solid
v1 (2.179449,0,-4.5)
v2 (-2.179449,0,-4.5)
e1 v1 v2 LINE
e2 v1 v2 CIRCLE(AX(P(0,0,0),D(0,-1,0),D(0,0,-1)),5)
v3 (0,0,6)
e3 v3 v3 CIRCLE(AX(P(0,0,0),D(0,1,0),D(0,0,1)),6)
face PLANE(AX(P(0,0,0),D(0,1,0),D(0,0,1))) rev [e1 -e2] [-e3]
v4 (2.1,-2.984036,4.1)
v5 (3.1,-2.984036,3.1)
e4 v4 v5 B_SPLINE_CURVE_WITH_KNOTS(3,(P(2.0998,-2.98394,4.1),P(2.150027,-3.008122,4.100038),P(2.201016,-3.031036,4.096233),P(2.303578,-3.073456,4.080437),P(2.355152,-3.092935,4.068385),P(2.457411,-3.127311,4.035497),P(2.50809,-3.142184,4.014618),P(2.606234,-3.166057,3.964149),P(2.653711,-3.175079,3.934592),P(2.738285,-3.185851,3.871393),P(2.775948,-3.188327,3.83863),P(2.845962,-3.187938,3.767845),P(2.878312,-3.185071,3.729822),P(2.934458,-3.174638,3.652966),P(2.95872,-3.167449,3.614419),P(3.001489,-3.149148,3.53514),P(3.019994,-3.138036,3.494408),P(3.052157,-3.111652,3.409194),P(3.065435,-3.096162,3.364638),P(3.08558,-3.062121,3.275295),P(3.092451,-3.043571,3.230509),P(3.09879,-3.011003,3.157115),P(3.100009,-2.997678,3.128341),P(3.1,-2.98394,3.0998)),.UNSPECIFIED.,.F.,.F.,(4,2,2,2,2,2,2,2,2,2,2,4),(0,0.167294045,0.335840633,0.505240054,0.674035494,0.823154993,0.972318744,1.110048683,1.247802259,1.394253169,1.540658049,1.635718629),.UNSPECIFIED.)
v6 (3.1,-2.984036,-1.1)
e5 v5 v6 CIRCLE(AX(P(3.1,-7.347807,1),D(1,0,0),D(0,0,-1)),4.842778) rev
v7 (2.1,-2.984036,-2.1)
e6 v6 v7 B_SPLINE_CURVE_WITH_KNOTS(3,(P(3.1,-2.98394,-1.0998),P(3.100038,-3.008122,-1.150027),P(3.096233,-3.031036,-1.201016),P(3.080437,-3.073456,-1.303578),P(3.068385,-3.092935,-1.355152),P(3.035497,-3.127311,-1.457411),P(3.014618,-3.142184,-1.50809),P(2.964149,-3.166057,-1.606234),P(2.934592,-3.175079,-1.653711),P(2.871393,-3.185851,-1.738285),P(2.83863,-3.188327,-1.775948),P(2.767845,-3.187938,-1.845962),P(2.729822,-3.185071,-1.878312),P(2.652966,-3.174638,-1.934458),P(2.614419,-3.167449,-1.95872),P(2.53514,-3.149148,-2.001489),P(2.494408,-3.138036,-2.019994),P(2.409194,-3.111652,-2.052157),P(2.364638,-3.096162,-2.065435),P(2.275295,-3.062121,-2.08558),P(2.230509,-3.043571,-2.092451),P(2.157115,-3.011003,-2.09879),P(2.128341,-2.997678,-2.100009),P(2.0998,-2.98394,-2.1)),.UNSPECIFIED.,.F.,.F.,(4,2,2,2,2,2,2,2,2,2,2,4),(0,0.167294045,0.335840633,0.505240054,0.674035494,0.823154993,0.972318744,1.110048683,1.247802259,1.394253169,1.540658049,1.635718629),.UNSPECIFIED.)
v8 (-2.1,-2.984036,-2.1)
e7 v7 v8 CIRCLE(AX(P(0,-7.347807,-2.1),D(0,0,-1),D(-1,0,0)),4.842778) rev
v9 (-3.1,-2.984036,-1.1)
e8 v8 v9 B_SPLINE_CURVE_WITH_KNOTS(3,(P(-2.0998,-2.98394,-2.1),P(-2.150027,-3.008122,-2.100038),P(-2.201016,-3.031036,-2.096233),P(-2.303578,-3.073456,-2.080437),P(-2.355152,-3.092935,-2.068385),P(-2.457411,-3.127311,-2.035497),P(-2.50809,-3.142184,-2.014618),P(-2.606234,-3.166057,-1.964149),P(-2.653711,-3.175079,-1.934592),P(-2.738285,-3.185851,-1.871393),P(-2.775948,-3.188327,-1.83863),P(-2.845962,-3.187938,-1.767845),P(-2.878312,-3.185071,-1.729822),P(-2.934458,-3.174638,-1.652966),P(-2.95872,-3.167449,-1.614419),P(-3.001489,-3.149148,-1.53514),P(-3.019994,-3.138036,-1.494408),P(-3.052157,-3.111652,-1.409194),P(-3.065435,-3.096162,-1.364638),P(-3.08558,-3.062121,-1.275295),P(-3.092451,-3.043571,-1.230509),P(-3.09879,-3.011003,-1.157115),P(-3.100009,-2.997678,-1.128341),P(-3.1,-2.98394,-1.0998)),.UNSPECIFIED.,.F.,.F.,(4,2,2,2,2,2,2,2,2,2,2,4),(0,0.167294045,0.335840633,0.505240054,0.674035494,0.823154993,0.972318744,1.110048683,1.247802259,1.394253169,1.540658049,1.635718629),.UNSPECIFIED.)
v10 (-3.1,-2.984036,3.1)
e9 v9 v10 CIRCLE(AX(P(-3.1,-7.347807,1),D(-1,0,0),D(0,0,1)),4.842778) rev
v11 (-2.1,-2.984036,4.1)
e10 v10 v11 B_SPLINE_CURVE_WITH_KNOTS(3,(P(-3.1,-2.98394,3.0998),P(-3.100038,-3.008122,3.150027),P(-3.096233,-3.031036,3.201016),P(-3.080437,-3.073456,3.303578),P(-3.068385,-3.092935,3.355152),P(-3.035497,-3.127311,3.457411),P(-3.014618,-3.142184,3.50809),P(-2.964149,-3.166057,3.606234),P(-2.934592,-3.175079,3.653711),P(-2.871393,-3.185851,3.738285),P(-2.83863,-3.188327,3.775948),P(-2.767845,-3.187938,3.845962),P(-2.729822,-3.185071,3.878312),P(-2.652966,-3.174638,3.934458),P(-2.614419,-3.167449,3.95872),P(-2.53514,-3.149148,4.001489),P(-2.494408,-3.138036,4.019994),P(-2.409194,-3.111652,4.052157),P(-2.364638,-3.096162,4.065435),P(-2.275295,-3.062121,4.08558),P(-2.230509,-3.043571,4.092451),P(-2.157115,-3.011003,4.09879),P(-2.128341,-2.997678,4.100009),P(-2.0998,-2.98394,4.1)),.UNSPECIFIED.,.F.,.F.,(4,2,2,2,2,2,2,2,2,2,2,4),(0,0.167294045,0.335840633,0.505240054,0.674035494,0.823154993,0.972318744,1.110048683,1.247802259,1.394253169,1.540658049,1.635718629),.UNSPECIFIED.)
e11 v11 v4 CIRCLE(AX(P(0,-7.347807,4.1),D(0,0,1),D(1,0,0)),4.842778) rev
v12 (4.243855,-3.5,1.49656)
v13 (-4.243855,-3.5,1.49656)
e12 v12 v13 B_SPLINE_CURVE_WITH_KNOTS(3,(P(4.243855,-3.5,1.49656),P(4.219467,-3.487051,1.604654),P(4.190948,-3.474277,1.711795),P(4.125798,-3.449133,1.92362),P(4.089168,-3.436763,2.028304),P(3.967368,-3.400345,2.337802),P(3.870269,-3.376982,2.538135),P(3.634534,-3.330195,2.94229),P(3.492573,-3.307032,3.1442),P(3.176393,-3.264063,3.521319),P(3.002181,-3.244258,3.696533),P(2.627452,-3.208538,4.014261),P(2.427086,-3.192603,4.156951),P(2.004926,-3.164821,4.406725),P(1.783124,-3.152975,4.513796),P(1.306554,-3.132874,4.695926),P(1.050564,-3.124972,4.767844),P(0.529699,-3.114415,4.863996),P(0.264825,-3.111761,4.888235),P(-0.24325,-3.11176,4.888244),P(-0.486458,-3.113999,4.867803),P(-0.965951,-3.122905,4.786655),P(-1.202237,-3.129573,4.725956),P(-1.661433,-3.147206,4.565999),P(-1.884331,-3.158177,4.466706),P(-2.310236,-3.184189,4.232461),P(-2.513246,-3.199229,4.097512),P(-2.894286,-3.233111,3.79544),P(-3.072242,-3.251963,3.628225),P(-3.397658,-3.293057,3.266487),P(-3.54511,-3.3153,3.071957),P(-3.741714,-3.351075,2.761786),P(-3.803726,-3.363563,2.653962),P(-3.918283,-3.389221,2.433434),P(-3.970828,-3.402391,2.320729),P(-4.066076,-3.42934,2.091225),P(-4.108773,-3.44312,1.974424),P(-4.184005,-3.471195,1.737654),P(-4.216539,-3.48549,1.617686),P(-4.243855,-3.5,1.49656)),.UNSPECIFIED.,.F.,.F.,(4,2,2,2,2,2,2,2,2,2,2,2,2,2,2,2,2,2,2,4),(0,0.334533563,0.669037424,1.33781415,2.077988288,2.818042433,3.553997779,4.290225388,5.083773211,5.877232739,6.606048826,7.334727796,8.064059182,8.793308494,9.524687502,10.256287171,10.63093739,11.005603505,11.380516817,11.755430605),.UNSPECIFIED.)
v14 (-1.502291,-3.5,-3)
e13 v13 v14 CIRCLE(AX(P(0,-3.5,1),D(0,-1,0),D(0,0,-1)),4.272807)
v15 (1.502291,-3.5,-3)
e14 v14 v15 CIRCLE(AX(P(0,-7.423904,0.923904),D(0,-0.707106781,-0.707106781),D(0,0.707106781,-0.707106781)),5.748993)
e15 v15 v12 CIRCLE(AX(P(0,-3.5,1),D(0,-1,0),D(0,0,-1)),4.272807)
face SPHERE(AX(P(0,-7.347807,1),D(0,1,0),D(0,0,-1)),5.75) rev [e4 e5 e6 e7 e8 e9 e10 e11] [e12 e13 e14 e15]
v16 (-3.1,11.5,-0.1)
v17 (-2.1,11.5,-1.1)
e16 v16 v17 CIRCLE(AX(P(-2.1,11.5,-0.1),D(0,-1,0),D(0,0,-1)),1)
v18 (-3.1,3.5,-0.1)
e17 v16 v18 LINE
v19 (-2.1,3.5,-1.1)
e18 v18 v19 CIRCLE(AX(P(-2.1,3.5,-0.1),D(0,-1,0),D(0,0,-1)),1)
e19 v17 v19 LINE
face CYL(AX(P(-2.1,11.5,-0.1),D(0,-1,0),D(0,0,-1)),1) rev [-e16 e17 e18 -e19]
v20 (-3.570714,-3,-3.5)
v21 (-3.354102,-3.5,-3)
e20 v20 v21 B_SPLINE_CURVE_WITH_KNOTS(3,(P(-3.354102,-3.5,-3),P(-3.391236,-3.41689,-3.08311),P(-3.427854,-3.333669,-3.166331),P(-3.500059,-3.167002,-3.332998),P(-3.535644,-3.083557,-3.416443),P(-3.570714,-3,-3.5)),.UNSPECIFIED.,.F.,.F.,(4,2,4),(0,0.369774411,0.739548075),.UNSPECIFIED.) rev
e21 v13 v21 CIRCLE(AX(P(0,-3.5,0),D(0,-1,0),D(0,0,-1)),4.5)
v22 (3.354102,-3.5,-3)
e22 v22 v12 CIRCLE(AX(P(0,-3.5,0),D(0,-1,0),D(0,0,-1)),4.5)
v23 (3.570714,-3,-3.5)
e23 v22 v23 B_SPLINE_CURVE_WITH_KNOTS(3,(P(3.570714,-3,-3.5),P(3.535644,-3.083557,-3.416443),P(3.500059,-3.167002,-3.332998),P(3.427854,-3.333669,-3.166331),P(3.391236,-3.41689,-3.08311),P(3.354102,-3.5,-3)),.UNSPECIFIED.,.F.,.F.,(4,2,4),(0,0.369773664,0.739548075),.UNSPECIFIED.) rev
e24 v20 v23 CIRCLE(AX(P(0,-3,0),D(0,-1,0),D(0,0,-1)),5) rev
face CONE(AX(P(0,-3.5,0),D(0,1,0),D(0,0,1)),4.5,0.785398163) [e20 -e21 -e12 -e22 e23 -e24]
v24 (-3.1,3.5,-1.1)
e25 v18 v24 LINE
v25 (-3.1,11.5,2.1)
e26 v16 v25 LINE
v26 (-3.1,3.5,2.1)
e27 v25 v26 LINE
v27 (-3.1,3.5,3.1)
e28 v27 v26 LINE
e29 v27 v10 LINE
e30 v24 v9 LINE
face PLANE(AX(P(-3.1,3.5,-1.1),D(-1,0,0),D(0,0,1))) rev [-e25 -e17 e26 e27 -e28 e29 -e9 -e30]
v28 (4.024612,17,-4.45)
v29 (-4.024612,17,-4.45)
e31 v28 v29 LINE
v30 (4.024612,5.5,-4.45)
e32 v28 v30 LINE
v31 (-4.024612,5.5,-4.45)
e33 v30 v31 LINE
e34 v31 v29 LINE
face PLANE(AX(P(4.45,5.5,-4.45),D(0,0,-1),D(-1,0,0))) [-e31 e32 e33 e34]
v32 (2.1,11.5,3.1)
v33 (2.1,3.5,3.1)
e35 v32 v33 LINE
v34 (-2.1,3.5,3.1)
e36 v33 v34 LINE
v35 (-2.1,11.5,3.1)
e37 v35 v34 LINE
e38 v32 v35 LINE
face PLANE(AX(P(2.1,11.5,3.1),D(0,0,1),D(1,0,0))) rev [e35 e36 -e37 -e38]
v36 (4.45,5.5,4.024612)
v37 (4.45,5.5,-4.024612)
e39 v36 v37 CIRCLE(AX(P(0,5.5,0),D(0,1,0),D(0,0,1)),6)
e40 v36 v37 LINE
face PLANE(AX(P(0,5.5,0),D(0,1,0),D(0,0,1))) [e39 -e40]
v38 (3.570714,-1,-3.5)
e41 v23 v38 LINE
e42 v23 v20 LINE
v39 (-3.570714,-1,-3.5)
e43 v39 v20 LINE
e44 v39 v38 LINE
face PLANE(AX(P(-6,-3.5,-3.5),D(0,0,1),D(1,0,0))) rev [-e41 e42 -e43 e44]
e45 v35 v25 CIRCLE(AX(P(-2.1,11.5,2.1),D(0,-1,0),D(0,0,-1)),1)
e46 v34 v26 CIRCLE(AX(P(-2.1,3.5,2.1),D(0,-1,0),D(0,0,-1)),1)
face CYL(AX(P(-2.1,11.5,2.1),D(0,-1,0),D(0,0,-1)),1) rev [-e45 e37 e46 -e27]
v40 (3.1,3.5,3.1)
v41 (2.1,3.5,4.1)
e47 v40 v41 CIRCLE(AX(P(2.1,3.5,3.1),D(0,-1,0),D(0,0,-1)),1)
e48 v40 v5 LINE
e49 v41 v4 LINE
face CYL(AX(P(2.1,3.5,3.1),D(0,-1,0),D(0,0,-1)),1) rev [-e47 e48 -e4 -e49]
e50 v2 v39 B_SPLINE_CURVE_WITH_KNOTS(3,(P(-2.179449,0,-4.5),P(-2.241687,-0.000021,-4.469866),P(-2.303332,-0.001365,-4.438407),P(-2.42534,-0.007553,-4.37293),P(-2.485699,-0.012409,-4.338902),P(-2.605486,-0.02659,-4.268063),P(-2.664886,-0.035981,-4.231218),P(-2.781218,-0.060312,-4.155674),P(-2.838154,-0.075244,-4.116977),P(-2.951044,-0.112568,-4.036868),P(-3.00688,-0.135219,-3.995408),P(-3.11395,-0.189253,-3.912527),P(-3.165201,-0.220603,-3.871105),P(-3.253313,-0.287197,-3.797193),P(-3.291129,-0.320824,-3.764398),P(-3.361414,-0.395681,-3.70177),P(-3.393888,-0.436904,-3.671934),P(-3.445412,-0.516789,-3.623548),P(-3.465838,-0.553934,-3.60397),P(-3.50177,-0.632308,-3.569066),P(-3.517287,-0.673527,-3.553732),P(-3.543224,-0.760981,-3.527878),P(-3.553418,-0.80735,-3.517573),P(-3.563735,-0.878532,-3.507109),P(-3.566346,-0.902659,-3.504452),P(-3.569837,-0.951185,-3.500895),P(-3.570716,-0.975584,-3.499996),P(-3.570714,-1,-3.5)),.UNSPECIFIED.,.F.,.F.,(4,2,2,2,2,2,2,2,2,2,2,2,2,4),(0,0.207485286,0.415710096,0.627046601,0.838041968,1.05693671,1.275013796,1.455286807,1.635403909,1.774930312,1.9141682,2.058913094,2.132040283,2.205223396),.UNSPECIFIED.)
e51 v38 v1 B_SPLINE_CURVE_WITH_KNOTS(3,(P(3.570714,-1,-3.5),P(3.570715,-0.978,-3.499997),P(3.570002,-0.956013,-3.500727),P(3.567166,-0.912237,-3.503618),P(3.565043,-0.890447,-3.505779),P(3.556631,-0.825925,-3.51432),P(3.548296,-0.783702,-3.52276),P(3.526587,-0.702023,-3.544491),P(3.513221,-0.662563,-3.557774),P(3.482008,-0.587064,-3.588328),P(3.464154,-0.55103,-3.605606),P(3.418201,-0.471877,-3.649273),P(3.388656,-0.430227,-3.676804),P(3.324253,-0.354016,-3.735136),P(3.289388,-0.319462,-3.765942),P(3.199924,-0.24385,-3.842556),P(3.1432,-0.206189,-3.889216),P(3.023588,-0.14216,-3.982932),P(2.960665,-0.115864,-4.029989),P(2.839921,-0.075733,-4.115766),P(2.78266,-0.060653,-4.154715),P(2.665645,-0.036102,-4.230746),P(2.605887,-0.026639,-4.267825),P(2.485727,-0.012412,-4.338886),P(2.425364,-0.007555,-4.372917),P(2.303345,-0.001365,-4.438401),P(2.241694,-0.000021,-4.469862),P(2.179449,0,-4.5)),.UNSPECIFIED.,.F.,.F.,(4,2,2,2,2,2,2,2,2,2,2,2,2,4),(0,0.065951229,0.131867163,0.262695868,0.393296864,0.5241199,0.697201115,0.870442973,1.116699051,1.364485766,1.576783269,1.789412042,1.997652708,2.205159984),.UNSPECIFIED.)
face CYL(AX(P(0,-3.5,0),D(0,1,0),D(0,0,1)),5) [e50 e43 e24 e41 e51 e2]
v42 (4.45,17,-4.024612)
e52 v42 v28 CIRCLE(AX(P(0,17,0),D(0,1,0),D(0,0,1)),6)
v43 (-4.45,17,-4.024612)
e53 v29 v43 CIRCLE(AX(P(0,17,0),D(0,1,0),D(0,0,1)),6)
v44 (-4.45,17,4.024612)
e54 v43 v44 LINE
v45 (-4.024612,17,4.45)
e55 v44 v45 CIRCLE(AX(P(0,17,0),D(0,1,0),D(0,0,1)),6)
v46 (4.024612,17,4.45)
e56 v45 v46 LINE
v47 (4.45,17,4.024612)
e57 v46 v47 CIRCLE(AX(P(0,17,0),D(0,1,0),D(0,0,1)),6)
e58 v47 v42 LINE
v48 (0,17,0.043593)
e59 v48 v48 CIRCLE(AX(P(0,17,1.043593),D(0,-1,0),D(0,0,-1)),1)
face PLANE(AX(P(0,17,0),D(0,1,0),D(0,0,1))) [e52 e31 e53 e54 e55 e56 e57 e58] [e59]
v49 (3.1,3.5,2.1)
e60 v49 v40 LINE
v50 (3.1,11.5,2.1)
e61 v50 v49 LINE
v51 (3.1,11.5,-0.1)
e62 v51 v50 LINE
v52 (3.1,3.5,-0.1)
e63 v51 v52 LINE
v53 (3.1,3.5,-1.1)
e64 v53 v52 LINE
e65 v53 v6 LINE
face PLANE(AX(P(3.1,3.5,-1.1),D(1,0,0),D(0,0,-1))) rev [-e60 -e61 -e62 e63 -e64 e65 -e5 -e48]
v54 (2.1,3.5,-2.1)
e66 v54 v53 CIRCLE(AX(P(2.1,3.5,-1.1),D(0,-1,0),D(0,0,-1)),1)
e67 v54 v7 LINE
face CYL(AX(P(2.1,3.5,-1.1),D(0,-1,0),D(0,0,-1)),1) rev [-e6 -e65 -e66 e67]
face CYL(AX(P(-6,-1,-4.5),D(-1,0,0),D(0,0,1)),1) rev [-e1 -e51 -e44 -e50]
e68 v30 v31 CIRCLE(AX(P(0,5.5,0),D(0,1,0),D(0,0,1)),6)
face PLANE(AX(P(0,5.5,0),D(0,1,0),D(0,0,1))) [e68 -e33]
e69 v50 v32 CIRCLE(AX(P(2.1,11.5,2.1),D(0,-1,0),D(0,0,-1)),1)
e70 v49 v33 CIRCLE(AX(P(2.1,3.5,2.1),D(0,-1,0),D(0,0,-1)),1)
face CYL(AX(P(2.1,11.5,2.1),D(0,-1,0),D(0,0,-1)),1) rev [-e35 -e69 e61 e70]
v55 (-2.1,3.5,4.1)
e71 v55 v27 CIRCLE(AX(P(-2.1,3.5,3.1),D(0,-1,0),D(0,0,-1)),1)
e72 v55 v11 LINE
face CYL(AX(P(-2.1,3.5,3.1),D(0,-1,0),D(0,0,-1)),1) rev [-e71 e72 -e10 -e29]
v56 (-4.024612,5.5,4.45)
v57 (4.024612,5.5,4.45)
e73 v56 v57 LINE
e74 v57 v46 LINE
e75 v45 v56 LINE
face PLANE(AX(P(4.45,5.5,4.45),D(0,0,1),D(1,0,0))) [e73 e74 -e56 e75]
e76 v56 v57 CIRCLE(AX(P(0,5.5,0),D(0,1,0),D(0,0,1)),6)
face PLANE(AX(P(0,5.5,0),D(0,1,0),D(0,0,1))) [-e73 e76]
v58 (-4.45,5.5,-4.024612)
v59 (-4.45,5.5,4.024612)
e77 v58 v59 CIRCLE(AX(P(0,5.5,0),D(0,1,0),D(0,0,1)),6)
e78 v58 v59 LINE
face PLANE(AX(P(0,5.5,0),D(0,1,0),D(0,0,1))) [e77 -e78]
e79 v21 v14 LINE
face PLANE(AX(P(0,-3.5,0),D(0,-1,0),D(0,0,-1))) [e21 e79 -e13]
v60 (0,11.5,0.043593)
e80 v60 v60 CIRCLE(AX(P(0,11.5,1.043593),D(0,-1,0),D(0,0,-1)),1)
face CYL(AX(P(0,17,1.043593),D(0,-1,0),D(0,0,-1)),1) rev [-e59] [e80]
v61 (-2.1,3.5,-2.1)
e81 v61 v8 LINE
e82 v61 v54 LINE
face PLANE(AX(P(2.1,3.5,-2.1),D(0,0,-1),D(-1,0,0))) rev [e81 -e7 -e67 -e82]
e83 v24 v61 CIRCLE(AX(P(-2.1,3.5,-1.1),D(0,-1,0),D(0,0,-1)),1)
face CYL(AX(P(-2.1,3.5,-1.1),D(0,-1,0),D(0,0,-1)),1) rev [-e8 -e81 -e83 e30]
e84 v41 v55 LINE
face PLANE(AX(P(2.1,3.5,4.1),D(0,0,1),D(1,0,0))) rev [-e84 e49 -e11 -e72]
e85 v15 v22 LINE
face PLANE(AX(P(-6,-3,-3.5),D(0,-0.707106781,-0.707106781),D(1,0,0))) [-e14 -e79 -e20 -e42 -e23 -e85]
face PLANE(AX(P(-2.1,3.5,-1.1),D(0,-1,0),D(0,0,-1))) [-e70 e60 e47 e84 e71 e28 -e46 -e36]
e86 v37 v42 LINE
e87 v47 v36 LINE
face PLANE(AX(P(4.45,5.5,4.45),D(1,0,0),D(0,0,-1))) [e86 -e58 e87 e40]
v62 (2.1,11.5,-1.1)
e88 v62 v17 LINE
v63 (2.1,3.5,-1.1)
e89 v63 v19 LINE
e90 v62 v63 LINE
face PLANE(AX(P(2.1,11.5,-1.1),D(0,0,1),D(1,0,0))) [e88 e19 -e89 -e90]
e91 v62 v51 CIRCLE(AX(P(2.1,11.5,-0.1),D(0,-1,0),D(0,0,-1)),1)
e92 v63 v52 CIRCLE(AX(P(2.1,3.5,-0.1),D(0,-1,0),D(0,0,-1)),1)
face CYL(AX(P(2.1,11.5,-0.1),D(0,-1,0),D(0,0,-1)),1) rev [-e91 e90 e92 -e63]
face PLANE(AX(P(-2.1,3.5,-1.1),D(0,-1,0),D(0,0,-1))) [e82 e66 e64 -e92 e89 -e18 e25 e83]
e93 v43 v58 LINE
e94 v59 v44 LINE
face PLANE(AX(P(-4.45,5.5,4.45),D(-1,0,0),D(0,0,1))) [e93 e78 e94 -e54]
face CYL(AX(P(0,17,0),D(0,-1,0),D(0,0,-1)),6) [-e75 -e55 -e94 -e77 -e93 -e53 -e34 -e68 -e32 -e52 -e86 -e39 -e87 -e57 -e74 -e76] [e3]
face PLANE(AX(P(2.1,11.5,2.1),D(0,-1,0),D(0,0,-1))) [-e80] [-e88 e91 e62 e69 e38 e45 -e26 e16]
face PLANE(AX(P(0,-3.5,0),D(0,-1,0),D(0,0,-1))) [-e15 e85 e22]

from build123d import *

# Parameters (mm, degrees)
SKETCH1_R               = 6
BOSS_EXTRUDE1_DEPTH     = 17
SKETCH2_OUTSIDE_W       = 18.804
SKETCH2_OUTSIDE_H       = 18.804
SKETCH2_OUTSIDE_W_2     = 8.9
SKETCH2_OUTSIDE_H_2     = 8.9
CUT_EXTRUDE1_DEPTH      = 11.5
SKETCH3_R               = 5
BOSS_EXTRUDE2_DEPTH     = 3.5
CUT_EXTRUDE2_DEPTH      = 20
CUT_EXTRUDE2_DEPTH_BACK = 20
SKETCH5_W               = 1.5
SKETCH5_H               = 3.5
FILLET2_R               = 1
CUT_EXTRUDE3_DEPTH      = 7
CUT_EXTRUDE4_DEPTH      = 8
SKETCH8_R               = 1
CUT_EXTRUDE5_DEPTH      = 18.233688027
CHAMFER1_START          = -6
CHAMFER1_2_OUTLINE_W    = 10
CHAMFER1_2_OUTLINE_H    = 4
CHAMFER1_2_DEPTH        = 1.403805922


with BuildPart() as part:
    # Sketch1 → Boss-Extrude1 (new body)
    with BuildSketch(Plane(origin=(0, 0, 0), x_dir=(1, 0, 0), z_dir=(0, 1, 0))):
        with Locations(Location((0, 0, 0), (0, 0, 270))):
            Circle(SKETCH1_R)
    extrude(amount=BOSS_EXTRUDE1_DEPTH)

    # Sketch2 outside → Cut-Extrude1 (cut)
    with BuildSketch(Plane(origin=(0, 17, 0), x_dir=(1, 0, 0), z_dir=(0, 1, 0))):
        Rectangle(SKETCH2_OUTSIDE_W, SKETCH2_OUTSIDE_H)
        Rectangle(SKETCH2_OUTSIDE_W_2, SKETCH2_OUTSIDE_H_2, mode=Mode.SUBTRACT)
    extrude(amount=-CUT_EXTRUDE1_DEPTH, mode=Mode.SUBTRACT)

    # Sketch3 → Boss-Extrude2 (add)
    with BuildSketch(Plane.XZ):
        with Locations(Location((0, 0, 0), (0, 0, 270))):
            Circle(SKETCH3_R)
    extrude(amount=BOSS_EXTRUDE2_DEPTH)

    # Sketch4 → Cut-Revolve2 (revolve, cut)
    with BuildSketch(Plane(origin=(0, -7.347807266, 1), x_dir=(0, 0, -1), z_dir=(1, 0, 0))):
        with BuildLine():
            Line((0, 5.75), (0, -5.75))
            ThreePointArc((0, -5.75), (-5.75, 0), (0, 5.75))
        make_face()
    revolve(axis=Axis((0, -1.597807266, 1), (0, -1, 0)), mode=Mode.SUBTRACT)

    # Sketch5 → Cut-Extrude2 (cut, two sides: drawn at the far end of the back side and taken through both)
    with BuildSketch(Plane(origin=(0, 0, 0), x_dir=(0, 0, -1), z_dir=(1, 0, 0)).offset(-CUT_EXTRUDE2_DEPTH_BACK)):
        with Locations((4.25, -1.75)):
            Rectangle(SKETCH5_W, SKETCH5_H)
    extrude(amount=CUT_EXTRUDE2_DEPTH + CUT_EXTRUDE2_DEPTH_BACK, mode=Mode.SUBTRACT)

    # Fillet2
    fillet2_edges = [part.edges().sort_by_distance(p)[0] for p in [
        (0, 0, -3.5),
    ]]
    fillet(fillet2_edges, radius=FILLET2_R)

    # Sketch6 → Cut-Extrude3 (cut)
    with BuildSketch(Plane.XZ.offset(3.5)):
        with BuildLine():
            Line((2.1, -2.1), (-2.1, -2.1))
            ThreePointArc((-2.1, -2.1), (-2.807106781, -1.807106781), (-3.1, -1.1))
            Line((-3.1, -1.1), (-3.1, 3.1))
            ThreePointArc((-3.1, 3.1), (-2.807106781, 3.807106781), (-2.1, 4.1))
            Line((-2.1, 4.1), (2.1, 4.1))
            ThreePointArc((2.1, 4.1), (2.807106781, 3.807106781), (3.1, 3.1))
            Line((3.1, 3.1), (3.1, -1.1))
            ThreePointArc((3.1, -1.1), (2.807106781, -1.807106781), (2.1, -2.1))
        make_face()
    extrude(amount=-CUT_EXTRUDE3_DEPTH, mode=Mode.SUBTRACT)

    # Sketch7 → Cut-Extrude4 (cut)
    with BuildSketch(Plane.XZ.offset(-3.5)):
        with BuildLine():
            Line((2.1, -1.1), (-2.1, -1.1))
            ThreePointArc((-2.1, -1.1), (-2.807106781, -0.807106781), (-3.1, -0.1))
            Line((-3.1, -0.1), (-3.1, 2.1))
            ThreePointArc((-3.1, 2.1), (-2.807106781, 2.807106781), (-2.1, 3.1))
            Line((-2.1, 3.1), (2.1, 3.1))
            ThreePointArc((2.1, 3.1), (2.807106781, 2.807106781), (3.1, 2.1))
            Line((3.1, 2.1), (3.1, -0.1))
            ThreePointArc((3.1, -0.1), (2.807106781, -0.807106781), (2.1, -1.1))
        make_face()
    extrude(amount=-CUT_EXTRUDE4_DEPTH, mode=Mode.SUBTRACT)

    # Sketch8 → Cut-Extrude5 (cut, through all)
    with BuildSketch(Plane.XZ.offset(-11.5)):
        with Locations(Location((0, 1.043592984, 0), (0, 0, 270))):
            Circle(SKETCH8_R)
    extrude(amount=-CUT_EXTRUDE5_DEPTH, mode=Mode.SUBTRACT)

    # Chamfer1: read off the stored shape, not the designer's step
    # Chamfer1 outline → Chamfer1 (revolve, cut)
    with BuildSketch(Plane.XY):
        Polygon((5, -3), (4.5, -3.5), (5, -3.5), align=None)
    revolve(axis=Axis((0, 0, 0), (0, 1, 0)), mode=Mode.SUBTRACT)

    # Chamfer1 2 outline → Chamfer1 2 (cut)
    with BuildSketch(Plane(origin=(0, 0, 0), x_dir=(1, 0, 0), z_dir=(0, 0.707106781186544, 0.707106781186551)).offset(CHAMFER1_START)):
        Rectangle(CHAMFER1_2_OUTLINE_W, CHAMFER1_2_OUTLINE_H)
    extrude(amount=CHAMFER1_2_DEPTH, mode=Mode.SUBTRACT)


solid = part.part
